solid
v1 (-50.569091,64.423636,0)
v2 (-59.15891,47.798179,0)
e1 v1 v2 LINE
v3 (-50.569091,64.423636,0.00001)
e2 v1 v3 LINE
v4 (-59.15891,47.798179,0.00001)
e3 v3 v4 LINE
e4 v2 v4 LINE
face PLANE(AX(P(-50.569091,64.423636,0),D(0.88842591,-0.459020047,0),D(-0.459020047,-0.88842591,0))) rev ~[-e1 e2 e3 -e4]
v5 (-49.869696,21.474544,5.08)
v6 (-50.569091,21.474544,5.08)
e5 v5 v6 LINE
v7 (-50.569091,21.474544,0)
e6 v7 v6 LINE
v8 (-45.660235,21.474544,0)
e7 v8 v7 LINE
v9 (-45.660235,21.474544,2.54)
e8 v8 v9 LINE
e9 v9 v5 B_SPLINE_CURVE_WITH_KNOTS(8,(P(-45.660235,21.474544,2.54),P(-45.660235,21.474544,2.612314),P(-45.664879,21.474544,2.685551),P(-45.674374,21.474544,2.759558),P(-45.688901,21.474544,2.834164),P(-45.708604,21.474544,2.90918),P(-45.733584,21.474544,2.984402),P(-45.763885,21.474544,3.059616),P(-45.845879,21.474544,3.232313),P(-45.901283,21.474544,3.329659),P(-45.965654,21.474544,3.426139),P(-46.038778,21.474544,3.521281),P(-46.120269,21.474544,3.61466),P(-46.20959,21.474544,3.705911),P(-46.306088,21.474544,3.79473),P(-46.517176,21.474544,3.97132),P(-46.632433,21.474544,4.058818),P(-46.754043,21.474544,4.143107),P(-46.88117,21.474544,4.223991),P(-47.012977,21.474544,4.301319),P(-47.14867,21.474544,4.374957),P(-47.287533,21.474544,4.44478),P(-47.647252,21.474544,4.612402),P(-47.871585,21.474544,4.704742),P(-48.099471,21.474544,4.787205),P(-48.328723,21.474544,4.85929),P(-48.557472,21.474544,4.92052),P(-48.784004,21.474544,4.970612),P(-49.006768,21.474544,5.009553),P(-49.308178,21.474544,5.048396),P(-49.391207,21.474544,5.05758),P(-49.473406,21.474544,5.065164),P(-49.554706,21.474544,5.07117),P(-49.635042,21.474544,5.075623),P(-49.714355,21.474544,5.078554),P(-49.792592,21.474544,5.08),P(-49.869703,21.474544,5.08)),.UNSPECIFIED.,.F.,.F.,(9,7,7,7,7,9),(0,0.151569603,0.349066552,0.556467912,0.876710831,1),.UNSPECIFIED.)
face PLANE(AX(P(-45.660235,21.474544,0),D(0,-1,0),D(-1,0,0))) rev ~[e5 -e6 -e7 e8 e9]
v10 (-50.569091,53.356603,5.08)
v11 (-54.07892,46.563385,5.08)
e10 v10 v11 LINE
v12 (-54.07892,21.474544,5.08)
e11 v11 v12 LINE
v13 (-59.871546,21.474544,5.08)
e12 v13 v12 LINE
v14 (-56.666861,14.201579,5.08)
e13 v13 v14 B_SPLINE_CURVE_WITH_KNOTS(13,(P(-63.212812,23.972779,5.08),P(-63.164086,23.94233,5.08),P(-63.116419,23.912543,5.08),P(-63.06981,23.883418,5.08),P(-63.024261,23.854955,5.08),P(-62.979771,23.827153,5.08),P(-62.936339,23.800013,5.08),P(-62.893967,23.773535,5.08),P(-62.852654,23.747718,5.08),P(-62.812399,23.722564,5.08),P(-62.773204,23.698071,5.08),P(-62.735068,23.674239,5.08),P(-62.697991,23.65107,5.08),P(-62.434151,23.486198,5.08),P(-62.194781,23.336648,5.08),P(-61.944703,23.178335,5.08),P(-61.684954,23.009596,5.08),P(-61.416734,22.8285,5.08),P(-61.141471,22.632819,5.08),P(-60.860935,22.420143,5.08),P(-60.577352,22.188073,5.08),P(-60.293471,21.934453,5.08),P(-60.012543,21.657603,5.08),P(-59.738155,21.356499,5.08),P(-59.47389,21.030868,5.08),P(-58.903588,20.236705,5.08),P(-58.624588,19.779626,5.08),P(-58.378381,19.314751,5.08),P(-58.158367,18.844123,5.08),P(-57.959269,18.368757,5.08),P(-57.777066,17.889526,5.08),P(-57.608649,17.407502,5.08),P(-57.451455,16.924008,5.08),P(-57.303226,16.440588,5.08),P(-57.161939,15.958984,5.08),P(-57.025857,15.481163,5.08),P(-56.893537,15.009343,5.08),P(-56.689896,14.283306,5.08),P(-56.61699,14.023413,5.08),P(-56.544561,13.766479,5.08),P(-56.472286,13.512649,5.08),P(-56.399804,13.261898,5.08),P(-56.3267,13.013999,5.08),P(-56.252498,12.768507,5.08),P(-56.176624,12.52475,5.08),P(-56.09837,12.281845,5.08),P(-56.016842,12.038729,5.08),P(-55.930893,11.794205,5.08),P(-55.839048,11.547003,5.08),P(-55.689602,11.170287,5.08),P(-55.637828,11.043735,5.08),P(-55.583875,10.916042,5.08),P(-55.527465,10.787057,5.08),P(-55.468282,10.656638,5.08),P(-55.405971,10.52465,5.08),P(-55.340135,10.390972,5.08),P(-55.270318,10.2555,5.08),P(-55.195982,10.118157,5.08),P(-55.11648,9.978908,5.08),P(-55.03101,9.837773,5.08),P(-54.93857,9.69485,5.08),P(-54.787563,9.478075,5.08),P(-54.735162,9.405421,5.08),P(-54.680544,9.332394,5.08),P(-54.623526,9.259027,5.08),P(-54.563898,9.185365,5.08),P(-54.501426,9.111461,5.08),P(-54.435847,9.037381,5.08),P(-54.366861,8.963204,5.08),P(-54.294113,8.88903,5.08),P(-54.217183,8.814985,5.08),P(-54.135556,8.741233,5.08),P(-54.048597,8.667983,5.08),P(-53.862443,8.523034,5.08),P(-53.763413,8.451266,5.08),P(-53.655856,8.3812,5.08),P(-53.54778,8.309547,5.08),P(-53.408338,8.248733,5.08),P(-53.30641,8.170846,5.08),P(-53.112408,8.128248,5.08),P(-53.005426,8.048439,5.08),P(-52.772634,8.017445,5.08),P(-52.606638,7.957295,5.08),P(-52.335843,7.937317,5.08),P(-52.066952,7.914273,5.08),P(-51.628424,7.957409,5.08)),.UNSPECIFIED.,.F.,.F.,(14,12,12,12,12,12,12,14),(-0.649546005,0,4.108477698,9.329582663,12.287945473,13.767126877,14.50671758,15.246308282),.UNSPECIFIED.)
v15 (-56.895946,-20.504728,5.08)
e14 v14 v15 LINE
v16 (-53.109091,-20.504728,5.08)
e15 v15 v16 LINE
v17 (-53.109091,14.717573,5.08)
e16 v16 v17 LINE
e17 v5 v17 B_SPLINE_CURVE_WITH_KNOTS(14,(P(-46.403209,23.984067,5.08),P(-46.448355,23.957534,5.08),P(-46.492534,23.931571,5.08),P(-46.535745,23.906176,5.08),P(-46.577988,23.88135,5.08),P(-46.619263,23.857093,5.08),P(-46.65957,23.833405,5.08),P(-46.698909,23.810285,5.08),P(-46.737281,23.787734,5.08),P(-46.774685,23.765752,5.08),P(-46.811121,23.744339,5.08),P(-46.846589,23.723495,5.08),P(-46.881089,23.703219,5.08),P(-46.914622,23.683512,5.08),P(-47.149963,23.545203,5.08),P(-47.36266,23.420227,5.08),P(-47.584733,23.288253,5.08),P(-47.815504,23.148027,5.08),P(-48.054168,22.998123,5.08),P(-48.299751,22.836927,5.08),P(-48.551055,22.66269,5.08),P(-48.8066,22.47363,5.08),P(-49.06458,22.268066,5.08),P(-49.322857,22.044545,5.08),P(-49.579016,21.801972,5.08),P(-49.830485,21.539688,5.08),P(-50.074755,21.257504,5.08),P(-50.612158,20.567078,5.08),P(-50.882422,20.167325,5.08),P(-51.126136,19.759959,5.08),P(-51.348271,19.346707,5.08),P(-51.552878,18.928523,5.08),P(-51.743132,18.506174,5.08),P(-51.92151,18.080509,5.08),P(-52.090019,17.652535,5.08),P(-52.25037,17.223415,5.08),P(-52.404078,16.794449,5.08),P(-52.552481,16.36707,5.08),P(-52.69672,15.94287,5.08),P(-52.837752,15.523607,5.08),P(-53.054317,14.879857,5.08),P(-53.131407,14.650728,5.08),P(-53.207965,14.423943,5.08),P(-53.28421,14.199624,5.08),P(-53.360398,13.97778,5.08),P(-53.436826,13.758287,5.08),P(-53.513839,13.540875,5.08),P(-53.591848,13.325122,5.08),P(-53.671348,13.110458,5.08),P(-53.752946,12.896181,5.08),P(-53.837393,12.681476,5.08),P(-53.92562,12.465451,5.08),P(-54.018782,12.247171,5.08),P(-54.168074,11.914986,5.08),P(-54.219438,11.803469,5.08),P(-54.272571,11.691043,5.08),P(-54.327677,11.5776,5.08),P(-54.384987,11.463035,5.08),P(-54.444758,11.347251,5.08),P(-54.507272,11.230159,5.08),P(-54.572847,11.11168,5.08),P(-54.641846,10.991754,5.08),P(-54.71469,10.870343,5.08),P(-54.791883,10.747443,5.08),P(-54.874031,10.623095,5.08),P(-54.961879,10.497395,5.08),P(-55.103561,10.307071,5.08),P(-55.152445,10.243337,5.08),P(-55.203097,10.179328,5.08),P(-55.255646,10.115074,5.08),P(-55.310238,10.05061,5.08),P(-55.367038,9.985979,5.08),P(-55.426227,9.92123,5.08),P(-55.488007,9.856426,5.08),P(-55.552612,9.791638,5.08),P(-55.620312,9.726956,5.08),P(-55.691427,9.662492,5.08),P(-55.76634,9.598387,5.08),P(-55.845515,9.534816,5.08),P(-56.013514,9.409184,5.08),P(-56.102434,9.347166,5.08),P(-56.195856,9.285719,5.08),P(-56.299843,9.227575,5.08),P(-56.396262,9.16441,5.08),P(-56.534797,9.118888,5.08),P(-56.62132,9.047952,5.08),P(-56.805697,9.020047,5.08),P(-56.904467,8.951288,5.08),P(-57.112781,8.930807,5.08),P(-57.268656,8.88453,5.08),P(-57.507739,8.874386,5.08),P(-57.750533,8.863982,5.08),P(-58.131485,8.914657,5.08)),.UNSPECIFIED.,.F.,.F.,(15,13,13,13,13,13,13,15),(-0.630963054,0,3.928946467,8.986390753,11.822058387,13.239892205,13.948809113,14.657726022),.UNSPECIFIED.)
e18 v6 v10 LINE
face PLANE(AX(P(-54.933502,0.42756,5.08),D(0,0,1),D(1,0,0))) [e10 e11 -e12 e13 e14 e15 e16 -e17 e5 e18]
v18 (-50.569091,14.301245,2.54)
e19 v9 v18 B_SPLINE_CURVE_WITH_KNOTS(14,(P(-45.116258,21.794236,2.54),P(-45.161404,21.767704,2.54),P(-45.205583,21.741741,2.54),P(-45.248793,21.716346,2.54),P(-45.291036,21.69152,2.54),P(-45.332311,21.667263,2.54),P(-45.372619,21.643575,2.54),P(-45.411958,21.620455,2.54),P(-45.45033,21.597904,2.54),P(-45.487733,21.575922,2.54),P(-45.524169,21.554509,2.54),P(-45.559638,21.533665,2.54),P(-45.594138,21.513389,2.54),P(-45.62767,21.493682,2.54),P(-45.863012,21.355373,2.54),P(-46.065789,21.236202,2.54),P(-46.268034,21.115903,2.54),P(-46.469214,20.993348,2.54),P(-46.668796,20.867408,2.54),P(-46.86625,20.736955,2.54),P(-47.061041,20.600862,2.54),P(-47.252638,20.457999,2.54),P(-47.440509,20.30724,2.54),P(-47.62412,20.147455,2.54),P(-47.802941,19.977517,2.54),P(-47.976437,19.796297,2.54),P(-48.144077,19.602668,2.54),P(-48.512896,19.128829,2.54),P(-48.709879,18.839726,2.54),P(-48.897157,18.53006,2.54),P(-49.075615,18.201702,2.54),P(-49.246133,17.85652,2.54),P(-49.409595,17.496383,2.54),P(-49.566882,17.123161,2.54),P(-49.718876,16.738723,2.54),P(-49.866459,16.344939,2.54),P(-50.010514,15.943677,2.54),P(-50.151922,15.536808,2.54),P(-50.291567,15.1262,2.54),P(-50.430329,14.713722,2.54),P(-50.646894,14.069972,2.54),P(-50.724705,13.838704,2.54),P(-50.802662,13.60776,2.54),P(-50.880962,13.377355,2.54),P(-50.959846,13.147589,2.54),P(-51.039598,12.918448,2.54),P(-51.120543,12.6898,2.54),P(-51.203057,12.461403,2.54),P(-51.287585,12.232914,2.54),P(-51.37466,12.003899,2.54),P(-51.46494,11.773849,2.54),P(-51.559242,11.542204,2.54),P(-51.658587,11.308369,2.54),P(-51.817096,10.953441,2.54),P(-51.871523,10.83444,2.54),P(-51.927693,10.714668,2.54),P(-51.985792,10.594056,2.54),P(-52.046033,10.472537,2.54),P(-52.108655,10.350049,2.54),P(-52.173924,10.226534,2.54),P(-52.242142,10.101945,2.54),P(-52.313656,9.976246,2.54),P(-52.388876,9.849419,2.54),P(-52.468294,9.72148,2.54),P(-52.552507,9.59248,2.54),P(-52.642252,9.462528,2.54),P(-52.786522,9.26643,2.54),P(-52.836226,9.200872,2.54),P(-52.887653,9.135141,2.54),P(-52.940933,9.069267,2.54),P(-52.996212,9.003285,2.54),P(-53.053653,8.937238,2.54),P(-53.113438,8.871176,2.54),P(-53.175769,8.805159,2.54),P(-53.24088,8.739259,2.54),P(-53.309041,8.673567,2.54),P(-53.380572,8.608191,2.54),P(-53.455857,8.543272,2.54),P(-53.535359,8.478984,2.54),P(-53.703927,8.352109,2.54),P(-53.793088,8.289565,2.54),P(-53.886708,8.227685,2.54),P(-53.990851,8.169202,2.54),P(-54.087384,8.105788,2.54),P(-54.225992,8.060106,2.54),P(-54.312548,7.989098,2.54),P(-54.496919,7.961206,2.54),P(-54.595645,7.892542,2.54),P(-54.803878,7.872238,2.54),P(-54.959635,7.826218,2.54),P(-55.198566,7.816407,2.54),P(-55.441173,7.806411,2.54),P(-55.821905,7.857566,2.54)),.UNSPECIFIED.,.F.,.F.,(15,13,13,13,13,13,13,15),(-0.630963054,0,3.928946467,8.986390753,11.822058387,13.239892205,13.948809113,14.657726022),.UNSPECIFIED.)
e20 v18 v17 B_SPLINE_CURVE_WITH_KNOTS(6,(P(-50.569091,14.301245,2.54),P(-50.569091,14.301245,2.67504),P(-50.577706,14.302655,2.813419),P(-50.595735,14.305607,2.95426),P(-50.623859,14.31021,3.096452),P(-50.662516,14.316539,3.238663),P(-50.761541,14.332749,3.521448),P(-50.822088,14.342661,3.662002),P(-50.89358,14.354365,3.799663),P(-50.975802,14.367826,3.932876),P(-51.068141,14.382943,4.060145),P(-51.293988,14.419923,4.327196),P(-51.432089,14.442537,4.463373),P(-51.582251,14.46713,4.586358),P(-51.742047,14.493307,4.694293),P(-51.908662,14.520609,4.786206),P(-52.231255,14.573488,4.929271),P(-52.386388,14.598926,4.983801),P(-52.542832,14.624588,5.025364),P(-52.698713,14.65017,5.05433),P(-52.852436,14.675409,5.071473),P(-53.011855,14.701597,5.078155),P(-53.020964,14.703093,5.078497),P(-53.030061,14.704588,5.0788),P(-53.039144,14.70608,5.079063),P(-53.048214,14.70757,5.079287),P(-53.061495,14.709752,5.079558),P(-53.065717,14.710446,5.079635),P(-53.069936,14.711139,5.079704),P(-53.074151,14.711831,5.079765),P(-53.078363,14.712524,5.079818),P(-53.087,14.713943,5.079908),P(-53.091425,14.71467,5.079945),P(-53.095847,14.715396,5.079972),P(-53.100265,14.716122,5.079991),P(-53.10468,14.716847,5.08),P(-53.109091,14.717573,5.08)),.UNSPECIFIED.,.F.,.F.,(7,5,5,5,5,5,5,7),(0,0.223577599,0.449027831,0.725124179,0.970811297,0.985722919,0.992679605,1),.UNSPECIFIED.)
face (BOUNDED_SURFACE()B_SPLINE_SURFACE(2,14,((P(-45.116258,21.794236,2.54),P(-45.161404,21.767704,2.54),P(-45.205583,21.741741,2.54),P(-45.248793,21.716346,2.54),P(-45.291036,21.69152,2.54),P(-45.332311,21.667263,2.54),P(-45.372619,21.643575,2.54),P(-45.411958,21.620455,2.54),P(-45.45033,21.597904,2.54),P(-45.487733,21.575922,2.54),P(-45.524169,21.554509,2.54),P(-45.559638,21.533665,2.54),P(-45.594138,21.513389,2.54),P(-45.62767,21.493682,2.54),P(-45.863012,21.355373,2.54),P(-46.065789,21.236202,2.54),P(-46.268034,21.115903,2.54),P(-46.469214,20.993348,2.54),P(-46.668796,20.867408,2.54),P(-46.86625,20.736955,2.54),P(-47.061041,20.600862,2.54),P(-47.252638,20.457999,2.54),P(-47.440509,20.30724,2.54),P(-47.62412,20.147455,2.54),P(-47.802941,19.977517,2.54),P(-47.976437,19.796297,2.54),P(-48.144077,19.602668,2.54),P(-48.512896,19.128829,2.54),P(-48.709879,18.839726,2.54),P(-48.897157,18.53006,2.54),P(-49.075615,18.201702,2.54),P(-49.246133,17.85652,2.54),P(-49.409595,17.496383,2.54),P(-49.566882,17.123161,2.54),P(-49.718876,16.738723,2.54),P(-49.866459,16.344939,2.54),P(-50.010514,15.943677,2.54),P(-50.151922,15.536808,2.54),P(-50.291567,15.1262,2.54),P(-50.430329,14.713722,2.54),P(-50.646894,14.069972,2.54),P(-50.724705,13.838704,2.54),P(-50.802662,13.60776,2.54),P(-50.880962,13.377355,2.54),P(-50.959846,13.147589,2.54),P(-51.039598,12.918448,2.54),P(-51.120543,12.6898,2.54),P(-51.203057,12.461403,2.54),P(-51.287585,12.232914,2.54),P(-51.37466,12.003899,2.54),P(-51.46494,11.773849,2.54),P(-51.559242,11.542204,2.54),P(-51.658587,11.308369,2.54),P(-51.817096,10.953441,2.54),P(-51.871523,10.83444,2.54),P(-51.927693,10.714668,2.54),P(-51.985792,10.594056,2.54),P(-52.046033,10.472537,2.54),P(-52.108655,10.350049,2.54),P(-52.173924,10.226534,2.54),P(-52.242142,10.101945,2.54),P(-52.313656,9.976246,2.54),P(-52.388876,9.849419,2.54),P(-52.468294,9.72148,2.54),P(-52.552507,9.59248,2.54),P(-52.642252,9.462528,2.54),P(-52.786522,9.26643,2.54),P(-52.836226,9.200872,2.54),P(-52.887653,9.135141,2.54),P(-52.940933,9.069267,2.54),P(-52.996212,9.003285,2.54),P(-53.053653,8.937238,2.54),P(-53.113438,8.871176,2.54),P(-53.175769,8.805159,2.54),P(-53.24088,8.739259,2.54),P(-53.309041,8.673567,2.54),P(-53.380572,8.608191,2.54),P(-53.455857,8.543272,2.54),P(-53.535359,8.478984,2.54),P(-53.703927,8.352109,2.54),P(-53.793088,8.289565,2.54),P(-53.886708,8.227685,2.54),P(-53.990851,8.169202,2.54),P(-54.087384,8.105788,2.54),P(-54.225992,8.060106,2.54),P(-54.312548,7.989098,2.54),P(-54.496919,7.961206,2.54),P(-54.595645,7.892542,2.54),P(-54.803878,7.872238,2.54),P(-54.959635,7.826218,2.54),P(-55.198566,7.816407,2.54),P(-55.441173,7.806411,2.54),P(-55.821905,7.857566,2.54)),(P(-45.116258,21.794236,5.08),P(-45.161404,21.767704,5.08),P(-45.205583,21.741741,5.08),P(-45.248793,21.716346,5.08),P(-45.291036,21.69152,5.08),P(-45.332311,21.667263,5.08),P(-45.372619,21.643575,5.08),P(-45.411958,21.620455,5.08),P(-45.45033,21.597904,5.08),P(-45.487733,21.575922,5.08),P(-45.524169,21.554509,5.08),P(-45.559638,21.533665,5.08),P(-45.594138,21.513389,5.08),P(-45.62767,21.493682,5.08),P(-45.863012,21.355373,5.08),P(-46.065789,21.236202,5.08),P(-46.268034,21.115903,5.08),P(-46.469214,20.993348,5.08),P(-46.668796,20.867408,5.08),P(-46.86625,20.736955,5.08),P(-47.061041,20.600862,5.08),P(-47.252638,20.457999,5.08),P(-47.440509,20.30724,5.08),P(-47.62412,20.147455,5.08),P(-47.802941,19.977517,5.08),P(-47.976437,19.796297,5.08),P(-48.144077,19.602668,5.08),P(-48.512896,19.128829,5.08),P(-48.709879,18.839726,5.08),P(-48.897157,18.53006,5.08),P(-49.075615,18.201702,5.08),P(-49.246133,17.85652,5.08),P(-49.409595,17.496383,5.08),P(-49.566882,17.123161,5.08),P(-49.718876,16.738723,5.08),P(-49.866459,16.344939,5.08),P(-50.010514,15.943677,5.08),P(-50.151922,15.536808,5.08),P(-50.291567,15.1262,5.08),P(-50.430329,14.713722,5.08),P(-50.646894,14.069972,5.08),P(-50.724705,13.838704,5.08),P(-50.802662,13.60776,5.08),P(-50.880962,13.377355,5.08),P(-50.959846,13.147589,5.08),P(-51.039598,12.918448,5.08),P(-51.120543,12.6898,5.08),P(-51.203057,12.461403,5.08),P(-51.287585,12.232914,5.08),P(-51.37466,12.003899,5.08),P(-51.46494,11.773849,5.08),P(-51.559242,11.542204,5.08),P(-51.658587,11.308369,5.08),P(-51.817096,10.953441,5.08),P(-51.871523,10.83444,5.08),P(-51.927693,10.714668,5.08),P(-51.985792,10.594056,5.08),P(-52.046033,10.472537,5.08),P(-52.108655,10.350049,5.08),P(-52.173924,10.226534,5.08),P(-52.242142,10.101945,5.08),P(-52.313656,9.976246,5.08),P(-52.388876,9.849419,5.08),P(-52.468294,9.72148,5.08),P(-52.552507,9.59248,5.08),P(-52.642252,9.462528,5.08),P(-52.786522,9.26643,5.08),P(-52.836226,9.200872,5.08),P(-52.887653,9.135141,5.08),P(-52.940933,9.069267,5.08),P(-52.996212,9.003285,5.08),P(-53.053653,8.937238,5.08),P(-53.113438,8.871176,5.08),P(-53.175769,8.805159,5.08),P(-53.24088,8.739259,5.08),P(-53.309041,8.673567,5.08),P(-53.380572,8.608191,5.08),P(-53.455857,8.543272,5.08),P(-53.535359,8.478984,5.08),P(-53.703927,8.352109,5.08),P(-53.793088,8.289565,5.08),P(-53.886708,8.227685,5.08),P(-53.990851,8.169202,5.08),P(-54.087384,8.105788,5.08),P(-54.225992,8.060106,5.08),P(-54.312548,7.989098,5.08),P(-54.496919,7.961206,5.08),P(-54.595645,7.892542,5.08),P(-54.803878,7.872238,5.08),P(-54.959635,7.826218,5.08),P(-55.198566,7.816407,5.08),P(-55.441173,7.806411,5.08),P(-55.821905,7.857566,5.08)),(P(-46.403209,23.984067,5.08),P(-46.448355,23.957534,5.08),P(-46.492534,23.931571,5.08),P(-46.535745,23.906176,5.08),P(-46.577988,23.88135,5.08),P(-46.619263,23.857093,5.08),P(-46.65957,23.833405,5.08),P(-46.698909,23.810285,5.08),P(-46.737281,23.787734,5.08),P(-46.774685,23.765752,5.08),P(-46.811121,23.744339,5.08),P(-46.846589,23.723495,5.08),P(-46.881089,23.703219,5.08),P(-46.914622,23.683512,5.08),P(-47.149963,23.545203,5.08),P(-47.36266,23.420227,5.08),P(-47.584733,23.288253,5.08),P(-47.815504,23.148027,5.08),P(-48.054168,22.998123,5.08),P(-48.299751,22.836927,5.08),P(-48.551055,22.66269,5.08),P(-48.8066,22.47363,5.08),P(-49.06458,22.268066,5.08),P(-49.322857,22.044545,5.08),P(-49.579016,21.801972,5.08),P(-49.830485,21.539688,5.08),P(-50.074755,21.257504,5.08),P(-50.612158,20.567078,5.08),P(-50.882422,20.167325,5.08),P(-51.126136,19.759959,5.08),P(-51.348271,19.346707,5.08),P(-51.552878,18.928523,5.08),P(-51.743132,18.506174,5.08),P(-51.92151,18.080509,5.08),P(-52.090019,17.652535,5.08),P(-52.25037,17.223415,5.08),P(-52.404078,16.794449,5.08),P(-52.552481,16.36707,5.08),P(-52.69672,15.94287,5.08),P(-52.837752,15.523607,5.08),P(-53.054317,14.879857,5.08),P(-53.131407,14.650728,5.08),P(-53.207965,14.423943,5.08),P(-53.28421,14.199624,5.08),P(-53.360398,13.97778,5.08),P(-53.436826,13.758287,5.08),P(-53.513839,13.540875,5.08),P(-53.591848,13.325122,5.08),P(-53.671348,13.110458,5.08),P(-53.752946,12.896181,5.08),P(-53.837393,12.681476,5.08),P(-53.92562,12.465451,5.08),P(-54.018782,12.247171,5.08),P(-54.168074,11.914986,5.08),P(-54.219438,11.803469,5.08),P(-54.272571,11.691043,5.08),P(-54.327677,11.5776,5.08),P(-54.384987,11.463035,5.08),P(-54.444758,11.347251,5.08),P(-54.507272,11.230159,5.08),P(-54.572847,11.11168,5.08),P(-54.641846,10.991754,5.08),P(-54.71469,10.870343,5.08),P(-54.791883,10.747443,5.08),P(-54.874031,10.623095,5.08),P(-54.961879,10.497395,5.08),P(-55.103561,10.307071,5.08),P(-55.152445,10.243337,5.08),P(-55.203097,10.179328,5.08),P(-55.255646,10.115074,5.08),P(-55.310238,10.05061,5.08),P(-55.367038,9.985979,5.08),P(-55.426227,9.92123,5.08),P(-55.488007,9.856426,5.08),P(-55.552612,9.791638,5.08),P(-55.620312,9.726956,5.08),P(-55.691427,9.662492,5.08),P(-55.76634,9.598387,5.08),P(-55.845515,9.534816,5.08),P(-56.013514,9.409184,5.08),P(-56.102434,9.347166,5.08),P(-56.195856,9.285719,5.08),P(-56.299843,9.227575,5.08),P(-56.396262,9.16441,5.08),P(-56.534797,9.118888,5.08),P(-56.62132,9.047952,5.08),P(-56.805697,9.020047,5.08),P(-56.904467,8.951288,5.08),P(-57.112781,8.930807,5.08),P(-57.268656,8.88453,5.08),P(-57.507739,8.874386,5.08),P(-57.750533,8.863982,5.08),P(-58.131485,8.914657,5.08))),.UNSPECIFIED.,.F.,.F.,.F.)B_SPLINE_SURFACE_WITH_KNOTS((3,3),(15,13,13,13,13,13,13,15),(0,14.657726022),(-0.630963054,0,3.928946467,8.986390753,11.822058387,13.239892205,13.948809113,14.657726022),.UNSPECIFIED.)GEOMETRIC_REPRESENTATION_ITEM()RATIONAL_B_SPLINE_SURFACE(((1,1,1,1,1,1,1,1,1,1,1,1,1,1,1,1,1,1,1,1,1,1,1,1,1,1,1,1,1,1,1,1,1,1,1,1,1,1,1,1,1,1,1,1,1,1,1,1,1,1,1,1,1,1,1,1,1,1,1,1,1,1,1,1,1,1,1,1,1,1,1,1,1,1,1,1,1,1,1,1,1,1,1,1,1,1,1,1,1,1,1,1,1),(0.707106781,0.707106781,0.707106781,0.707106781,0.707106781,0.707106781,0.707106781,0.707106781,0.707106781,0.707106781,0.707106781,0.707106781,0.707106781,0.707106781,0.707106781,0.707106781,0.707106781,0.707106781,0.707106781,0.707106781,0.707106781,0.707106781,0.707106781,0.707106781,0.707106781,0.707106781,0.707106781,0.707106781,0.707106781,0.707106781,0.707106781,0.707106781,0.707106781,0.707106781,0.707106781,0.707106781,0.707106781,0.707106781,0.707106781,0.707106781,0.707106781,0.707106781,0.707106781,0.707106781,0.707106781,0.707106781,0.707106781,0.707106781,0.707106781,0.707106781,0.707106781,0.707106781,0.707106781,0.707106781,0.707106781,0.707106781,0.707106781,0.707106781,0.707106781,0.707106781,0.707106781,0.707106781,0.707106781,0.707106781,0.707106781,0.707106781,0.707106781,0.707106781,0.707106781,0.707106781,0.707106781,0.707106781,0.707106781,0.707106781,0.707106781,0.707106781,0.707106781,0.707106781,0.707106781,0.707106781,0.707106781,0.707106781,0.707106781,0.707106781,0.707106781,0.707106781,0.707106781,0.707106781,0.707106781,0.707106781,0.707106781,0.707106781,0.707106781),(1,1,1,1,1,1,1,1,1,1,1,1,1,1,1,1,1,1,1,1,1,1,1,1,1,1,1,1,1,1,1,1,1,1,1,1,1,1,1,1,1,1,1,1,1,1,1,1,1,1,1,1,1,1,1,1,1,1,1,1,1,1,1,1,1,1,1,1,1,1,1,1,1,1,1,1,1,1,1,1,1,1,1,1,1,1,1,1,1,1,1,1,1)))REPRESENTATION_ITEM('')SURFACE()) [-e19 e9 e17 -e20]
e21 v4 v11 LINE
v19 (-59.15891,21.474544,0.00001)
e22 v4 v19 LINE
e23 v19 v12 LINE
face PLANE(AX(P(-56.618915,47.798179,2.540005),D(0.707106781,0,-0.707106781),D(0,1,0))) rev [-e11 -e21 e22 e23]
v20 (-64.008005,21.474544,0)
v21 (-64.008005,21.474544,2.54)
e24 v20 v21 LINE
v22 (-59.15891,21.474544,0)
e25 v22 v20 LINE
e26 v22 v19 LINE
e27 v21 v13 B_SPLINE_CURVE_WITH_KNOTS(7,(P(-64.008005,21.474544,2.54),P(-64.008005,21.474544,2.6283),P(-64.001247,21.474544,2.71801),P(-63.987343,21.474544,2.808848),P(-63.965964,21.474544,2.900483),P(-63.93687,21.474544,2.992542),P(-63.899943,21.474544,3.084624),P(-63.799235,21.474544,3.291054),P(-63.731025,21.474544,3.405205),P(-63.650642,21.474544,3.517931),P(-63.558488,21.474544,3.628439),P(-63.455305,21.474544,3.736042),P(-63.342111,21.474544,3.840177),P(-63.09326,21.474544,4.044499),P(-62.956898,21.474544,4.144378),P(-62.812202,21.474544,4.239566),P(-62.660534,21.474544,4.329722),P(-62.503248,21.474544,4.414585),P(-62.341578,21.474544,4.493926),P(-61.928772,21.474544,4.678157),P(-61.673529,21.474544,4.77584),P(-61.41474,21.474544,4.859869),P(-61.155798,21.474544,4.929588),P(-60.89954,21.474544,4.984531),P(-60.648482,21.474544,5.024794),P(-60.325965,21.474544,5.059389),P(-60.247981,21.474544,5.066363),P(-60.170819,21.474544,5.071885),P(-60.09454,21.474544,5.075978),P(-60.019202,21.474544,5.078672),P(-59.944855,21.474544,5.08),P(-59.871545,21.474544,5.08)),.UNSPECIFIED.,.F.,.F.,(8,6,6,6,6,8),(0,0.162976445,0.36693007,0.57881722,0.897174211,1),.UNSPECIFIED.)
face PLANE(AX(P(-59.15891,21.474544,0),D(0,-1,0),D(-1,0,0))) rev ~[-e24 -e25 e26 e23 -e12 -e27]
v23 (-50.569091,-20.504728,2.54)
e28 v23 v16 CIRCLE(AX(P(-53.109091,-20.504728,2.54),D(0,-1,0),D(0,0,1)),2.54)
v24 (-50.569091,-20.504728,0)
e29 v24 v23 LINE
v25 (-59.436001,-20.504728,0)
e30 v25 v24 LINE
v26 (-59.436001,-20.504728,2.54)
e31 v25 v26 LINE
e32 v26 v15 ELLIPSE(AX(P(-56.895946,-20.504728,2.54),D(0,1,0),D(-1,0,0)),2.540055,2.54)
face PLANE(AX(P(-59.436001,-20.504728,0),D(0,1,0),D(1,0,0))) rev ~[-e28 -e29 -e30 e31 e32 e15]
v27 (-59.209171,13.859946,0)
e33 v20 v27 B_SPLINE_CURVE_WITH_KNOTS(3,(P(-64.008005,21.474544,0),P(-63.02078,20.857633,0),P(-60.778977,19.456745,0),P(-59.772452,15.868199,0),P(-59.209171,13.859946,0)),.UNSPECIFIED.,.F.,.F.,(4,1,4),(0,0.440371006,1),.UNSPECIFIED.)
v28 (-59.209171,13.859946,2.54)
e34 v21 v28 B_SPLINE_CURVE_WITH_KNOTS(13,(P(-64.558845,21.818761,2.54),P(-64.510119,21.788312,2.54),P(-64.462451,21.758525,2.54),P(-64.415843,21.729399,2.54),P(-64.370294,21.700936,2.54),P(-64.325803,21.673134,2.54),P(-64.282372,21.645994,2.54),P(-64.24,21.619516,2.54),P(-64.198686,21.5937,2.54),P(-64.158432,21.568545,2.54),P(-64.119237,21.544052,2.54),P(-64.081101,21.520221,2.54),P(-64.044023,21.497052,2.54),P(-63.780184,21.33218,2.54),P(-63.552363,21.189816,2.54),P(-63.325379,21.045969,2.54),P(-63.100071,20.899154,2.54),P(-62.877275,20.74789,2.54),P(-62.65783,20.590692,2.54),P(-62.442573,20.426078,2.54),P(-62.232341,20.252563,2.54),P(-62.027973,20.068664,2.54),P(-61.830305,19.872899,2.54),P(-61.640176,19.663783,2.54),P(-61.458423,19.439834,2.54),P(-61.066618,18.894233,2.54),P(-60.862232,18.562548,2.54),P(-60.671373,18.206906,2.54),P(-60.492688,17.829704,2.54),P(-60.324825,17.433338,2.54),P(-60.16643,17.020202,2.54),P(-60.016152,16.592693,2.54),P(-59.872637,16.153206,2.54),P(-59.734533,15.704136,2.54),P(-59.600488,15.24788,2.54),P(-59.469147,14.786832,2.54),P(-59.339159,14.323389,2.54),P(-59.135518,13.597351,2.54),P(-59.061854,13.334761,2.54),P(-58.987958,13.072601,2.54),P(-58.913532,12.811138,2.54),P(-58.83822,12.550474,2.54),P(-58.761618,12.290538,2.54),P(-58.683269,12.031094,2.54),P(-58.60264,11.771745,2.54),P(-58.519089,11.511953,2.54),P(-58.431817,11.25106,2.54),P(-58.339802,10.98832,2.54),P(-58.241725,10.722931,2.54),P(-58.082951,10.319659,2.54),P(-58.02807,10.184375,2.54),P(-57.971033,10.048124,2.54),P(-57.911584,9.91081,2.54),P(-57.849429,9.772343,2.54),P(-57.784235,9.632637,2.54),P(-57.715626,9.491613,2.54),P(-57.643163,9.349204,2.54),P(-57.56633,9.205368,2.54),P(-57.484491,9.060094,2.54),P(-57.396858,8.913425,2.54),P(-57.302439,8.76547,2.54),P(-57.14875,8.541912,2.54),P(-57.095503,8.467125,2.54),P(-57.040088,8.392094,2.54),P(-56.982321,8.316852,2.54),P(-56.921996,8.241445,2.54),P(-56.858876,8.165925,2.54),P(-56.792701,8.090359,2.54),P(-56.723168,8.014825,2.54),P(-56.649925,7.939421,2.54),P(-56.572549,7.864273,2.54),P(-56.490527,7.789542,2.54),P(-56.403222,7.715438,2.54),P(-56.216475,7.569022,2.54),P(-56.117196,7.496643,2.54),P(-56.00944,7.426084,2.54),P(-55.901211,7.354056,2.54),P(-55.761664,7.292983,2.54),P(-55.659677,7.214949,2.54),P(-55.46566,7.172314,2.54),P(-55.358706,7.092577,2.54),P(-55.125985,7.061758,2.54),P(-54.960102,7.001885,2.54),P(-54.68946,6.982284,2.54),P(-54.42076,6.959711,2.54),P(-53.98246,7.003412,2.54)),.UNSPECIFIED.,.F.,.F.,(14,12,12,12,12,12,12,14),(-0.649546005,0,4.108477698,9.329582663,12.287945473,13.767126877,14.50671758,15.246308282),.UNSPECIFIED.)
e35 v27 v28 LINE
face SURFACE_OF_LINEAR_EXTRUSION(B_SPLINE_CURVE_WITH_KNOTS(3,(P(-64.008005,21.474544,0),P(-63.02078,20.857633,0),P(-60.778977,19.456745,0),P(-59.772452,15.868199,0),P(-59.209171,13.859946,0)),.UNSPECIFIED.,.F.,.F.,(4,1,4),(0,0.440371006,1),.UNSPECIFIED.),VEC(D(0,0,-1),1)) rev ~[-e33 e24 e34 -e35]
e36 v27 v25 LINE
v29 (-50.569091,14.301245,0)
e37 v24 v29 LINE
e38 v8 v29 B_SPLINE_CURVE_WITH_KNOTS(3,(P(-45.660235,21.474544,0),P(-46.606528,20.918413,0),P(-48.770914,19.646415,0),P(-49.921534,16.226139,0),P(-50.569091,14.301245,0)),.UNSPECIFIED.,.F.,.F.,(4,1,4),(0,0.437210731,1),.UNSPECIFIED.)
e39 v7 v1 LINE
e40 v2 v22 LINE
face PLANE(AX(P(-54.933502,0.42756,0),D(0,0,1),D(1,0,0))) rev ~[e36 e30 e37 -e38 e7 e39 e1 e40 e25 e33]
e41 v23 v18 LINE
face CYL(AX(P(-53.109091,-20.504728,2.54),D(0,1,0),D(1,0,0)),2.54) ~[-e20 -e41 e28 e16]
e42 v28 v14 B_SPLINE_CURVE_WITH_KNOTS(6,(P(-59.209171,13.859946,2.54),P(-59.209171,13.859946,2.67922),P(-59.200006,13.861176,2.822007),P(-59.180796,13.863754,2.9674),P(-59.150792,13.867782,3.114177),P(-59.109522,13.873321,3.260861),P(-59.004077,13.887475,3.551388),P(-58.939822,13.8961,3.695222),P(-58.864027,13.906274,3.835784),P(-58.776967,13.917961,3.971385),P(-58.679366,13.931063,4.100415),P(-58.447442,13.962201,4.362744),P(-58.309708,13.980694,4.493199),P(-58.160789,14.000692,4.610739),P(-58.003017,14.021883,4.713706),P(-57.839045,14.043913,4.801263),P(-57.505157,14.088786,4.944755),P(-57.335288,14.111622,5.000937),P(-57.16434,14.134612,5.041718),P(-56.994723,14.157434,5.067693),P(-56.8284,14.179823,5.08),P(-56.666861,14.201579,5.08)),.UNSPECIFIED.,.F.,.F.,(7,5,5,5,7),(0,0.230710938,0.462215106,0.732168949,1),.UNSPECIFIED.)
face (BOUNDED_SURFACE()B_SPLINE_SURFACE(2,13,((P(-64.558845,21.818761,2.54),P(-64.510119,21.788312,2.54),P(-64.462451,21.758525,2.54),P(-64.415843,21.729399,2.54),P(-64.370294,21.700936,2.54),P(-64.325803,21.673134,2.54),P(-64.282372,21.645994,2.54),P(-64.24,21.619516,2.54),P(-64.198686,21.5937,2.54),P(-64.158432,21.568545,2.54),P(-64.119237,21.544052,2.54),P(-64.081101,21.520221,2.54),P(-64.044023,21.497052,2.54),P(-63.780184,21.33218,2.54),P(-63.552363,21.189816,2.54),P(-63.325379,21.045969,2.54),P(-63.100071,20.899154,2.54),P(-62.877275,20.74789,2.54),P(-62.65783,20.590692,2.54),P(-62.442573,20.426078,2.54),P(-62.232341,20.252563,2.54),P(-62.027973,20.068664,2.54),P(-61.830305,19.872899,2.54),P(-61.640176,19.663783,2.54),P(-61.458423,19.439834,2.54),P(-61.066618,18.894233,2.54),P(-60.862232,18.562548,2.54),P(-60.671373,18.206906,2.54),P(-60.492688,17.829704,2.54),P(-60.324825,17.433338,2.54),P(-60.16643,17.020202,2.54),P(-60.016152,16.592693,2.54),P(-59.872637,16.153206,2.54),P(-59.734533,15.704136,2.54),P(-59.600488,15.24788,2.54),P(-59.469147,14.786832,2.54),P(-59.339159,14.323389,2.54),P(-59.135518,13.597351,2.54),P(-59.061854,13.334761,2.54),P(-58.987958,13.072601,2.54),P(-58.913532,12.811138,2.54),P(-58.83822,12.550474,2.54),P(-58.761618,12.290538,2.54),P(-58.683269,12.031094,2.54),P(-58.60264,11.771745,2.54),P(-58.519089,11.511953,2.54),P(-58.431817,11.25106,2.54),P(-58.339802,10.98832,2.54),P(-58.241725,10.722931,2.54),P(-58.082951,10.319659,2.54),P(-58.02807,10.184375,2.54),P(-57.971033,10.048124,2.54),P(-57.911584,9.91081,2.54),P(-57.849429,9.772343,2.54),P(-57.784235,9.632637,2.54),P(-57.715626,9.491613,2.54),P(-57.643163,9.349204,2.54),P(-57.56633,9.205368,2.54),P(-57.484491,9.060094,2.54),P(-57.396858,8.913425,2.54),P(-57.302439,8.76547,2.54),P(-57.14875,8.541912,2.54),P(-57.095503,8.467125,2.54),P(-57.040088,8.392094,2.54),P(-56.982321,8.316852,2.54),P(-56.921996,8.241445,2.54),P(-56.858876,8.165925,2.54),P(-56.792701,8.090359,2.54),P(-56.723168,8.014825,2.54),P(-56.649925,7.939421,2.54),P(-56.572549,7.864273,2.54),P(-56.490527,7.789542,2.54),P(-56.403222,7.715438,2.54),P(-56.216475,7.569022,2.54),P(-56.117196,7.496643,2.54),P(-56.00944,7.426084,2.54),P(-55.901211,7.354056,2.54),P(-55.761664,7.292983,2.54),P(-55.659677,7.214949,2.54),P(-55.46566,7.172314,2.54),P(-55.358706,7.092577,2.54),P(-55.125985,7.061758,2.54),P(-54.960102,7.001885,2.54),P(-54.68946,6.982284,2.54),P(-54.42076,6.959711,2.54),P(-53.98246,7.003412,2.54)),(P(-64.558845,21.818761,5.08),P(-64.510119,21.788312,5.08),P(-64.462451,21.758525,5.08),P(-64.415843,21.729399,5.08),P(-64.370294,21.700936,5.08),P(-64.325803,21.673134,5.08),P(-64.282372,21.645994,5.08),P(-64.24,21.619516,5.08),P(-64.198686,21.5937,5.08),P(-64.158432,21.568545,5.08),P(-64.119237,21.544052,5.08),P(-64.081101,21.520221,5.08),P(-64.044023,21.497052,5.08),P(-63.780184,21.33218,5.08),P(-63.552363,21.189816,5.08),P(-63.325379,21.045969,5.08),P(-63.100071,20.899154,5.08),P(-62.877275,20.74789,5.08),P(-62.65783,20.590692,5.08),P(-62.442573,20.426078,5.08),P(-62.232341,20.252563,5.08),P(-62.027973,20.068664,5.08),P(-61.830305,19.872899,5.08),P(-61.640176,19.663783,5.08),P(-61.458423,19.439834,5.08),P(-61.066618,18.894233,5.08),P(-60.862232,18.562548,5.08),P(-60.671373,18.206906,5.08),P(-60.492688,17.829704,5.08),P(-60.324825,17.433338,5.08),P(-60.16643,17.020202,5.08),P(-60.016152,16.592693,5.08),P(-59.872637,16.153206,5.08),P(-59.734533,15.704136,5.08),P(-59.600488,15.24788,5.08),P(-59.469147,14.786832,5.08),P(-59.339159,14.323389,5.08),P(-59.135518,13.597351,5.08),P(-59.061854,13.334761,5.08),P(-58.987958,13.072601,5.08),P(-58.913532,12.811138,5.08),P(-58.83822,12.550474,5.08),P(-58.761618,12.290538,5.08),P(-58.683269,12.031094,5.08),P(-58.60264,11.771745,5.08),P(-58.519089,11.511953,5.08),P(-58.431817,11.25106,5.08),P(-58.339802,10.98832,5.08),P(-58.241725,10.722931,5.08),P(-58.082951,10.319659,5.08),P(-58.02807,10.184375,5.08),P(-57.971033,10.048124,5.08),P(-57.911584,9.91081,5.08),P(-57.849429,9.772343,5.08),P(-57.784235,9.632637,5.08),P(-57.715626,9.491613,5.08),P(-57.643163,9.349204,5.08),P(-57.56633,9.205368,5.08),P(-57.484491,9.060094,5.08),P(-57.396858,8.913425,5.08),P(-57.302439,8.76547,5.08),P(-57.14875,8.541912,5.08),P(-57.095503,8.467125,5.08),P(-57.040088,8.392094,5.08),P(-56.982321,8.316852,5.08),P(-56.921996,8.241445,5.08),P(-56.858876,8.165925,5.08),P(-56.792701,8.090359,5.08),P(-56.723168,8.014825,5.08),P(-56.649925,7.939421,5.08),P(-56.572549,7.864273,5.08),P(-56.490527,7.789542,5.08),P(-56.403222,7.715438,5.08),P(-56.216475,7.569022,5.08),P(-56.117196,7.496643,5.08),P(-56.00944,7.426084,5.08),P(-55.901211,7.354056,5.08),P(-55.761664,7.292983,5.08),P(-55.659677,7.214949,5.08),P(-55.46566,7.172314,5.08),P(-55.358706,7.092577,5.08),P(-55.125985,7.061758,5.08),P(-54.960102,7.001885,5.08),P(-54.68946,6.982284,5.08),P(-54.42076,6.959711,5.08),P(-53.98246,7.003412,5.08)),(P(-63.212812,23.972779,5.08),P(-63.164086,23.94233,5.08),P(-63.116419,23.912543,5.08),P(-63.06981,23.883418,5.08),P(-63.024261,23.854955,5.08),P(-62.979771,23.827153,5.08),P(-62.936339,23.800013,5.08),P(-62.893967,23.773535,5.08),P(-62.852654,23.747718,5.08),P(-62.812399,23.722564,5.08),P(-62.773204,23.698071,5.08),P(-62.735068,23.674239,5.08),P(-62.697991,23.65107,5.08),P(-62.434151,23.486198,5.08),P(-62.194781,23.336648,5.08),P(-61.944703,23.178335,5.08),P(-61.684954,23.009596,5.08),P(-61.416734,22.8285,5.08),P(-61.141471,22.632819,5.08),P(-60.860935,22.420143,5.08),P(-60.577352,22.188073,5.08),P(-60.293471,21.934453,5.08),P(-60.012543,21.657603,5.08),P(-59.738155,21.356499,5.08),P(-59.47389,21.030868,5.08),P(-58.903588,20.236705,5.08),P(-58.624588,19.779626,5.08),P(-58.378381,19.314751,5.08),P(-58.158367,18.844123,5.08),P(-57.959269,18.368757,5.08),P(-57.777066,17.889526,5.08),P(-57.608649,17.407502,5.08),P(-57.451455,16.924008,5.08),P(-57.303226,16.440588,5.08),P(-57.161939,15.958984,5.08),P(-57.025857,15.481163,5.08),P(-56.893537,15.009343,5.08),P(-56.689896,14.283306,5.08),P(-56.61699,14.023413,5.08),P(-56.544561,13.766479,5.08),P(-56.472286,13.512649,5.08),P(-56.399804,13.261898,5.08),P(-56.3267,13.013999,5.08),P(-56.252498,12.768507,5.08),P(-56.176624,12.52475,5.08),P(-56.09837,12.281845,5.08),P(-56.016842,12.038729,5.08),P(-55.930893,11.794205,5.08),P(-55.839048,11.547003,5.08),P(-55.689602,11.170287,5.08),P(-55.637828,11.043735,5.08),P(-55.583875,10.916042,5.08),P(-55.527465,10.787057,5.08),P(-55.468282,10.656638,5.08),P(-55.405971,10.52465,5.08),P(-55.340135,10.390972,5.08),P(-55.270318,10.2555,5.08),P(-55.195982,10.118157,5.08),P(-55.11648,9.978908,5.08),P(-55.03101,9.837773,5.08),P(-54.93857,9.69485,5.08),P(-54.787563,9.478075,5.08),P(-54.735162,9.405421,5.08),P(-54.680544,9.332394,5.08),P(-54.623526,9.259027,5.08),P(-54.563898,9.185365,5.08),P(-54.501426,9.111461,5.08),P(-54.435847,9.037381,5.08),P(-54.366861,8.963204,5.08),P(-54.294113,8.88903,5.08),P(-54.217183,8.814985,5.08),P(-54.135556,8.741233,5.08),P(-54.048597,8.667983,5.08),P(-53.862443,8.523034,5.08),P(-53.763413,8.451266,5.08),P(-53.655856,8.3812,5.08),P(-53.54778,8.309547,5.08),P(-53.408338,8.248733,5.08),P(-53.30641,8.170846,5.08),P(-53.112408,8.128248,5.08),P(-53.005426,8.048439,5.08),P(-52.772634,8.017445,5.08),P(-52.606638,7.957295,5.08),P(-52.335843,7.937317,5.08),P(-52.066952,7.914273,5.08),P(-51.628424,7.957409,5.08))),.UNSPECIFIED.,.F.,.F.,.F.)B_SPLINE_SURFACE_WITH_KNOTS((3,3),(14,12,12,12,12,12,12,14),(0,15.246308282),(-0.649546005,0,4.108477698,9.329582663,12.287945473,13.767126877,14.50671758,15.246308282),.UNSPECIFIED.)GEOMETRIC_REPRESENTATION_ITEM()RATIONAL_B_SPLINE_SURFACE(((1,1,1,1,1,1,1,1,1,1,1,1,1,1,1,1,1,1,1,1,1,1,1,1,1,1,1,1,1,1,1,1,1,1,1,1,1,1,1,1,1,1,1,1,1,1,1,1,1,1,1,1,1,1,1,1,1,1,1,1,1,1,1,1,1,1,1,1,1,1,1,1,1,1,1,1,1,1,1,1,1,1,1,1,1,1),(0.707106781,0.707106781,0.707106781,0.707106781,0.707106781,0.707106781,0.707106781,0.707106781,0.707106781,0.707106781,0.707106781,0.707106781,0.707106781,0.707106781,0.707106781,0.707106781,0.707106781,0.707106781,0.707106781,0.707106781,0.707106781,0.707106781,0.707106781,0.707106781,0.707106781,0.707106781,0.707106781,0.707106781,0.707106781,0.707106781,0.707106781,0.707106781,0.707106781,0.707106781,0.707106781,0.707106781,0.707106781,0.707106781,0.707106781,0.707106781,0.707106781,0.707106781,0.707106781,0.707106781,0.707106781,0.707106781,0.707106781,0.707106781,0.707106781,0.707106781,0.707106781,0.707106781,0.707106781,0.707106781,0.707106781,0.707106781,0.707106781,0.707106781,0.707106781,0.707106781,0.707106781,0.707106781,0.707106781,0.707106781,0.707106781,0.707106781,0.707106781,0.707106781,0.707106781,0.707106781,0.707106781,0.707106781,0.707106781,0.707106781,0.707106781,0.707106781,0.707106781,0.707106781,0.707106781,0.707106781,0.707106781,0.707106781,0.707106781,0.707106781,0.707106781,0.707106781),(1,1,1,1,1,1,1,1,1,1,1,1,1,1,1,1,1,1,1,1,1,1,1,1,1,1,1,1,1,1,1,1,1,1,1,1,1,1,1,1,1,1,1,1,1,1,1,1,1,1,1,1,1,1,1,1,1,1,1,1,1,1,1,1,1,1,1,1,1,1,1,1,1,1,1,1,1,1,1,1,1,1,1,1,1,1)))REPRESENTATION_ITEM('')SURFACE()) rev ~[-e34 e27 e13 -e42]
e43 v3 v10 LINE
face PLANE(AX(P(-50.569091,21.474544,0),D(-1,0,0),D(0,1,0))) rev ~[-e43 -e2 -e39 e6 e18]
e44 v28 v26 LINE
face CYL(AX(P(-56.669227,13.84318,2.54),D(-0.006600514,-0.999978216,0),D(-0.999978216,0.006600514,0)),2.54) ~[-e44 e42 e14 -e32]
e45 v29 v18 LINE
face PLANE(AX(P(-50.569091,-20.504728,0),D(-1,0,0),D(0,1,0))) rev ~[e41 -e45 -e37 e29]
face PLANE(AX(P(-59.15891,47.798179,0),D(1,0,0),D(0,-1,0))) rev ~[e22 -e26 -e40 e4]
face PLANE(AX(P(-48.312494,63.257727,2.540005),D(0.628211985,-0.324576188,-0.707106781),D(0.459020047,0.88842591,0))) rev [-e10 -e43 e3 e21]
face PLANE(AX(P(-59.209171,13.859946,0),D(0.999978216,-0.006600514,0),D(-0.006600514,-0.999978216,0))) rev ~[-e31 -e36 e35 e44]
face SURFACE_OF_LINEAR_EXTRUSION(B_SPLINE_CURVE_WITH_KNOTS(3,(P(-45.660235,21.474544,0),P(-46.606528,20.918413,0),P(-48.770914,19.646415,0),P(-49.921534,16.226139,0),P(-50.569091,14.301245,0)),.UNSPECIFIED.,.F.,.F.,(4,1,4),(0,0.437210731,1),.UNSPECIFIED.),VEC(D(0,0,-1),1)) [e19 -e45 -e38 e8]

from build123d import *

# Parameters (mm, degrees)
F1_DEPTH = 5.08
F2_SIZE  = 5.07999
F3_R     = 2.54


# Not quite as in the source:
# - a fillet or chamfer is up to 0.001 mm smaller than in the source, because OpenCascade refuses the exact size


with BuildPart() as f1:
    # F0 (on Top) → F1 (new body)
    with BuildSketch(Plane.XY):
        Polygon((-50.5690909922, 21.4745439589), (-59.1589100659, 21.4745439589), (-59.2091714259, 13.8599455538), (-59.4360008836, -20.5047279596), (-50.5690909922, -20.5047279596), (-50.5690909922, 14.3012451008), align=None)
        with BuildLine():
            Line((-59.2091714259, 13.8599455538), (-59.1589100659, 21.4745439589))
            Line((-59.1589100659, 21.4745439589), (-64.0080049634, 21.4745439589))
            add(Edge.make_bspline(
                [(-64.0080049634, 21.4745439589), (-63.0207799447, 20.8576332232), (-60.7789769957, 19.4567445904), (-59.7724519982, 15.8681994581), (-59.2091714259, 13.8599455538)],
                knots=[0, 0, 0, 0, 0.4403710055, 1, 1, 1, 1], degree=3))
        make_face()
        Polygon((-59.1589100659, 47.79817909), (-59.1589100659, 21.4745439589), (-50.5690909922, 21.4745439589), (-50.5690909922, 64.423635602), align=None)
        with BuildLine():
            Line((-45.6602349877, 21.4745439589), (-50.5690909922, 21.4745439589))
            Line((-50.5690909922, 21.4745439589), (-50.5690909922, 14.3012451008))
            add(Edge.make_bspline(
                [(-45.6602349877, 21.4745439589), (-46.6065278441, 20.9184128466), (-48.770914008, 19.6464149903), (-49.9215342609, 16.2261394646), (-50.5690909922, 14.3012451008)],
                knots=[0, 0, 0, 0, 0.4372107307, 1, 1, 1, 1], degree=3))
        make_face()
    extrude(amount=F1_DEPTH)

    # F2 (size 5.08 in the source; OpenCascade refuses exactly that, so slightly less here)
    f2_edges = [f1.edges().sort_by_distance(p)[0] for p in [
        (-59.15891, 34.636362, 5.08),
        (-54.864001, 56.110907, 5.08),
    ]]
    chamfer(f2_edges, length=F2_SIZE)

    # F3
    f3_edges = [f1.edges().sort_by_distance(p)[0] for p in [
        (-59.322586, -3.322391, 5.08),
        (-50.569091, -3.101741, 5.08),
        (-60.725717, 18.263642, 5.08),
        (-48.908594, 18.46974, 5.08),
    ]]
    fillet(f3_edges, radius=F3_R)


solid = f1.part
